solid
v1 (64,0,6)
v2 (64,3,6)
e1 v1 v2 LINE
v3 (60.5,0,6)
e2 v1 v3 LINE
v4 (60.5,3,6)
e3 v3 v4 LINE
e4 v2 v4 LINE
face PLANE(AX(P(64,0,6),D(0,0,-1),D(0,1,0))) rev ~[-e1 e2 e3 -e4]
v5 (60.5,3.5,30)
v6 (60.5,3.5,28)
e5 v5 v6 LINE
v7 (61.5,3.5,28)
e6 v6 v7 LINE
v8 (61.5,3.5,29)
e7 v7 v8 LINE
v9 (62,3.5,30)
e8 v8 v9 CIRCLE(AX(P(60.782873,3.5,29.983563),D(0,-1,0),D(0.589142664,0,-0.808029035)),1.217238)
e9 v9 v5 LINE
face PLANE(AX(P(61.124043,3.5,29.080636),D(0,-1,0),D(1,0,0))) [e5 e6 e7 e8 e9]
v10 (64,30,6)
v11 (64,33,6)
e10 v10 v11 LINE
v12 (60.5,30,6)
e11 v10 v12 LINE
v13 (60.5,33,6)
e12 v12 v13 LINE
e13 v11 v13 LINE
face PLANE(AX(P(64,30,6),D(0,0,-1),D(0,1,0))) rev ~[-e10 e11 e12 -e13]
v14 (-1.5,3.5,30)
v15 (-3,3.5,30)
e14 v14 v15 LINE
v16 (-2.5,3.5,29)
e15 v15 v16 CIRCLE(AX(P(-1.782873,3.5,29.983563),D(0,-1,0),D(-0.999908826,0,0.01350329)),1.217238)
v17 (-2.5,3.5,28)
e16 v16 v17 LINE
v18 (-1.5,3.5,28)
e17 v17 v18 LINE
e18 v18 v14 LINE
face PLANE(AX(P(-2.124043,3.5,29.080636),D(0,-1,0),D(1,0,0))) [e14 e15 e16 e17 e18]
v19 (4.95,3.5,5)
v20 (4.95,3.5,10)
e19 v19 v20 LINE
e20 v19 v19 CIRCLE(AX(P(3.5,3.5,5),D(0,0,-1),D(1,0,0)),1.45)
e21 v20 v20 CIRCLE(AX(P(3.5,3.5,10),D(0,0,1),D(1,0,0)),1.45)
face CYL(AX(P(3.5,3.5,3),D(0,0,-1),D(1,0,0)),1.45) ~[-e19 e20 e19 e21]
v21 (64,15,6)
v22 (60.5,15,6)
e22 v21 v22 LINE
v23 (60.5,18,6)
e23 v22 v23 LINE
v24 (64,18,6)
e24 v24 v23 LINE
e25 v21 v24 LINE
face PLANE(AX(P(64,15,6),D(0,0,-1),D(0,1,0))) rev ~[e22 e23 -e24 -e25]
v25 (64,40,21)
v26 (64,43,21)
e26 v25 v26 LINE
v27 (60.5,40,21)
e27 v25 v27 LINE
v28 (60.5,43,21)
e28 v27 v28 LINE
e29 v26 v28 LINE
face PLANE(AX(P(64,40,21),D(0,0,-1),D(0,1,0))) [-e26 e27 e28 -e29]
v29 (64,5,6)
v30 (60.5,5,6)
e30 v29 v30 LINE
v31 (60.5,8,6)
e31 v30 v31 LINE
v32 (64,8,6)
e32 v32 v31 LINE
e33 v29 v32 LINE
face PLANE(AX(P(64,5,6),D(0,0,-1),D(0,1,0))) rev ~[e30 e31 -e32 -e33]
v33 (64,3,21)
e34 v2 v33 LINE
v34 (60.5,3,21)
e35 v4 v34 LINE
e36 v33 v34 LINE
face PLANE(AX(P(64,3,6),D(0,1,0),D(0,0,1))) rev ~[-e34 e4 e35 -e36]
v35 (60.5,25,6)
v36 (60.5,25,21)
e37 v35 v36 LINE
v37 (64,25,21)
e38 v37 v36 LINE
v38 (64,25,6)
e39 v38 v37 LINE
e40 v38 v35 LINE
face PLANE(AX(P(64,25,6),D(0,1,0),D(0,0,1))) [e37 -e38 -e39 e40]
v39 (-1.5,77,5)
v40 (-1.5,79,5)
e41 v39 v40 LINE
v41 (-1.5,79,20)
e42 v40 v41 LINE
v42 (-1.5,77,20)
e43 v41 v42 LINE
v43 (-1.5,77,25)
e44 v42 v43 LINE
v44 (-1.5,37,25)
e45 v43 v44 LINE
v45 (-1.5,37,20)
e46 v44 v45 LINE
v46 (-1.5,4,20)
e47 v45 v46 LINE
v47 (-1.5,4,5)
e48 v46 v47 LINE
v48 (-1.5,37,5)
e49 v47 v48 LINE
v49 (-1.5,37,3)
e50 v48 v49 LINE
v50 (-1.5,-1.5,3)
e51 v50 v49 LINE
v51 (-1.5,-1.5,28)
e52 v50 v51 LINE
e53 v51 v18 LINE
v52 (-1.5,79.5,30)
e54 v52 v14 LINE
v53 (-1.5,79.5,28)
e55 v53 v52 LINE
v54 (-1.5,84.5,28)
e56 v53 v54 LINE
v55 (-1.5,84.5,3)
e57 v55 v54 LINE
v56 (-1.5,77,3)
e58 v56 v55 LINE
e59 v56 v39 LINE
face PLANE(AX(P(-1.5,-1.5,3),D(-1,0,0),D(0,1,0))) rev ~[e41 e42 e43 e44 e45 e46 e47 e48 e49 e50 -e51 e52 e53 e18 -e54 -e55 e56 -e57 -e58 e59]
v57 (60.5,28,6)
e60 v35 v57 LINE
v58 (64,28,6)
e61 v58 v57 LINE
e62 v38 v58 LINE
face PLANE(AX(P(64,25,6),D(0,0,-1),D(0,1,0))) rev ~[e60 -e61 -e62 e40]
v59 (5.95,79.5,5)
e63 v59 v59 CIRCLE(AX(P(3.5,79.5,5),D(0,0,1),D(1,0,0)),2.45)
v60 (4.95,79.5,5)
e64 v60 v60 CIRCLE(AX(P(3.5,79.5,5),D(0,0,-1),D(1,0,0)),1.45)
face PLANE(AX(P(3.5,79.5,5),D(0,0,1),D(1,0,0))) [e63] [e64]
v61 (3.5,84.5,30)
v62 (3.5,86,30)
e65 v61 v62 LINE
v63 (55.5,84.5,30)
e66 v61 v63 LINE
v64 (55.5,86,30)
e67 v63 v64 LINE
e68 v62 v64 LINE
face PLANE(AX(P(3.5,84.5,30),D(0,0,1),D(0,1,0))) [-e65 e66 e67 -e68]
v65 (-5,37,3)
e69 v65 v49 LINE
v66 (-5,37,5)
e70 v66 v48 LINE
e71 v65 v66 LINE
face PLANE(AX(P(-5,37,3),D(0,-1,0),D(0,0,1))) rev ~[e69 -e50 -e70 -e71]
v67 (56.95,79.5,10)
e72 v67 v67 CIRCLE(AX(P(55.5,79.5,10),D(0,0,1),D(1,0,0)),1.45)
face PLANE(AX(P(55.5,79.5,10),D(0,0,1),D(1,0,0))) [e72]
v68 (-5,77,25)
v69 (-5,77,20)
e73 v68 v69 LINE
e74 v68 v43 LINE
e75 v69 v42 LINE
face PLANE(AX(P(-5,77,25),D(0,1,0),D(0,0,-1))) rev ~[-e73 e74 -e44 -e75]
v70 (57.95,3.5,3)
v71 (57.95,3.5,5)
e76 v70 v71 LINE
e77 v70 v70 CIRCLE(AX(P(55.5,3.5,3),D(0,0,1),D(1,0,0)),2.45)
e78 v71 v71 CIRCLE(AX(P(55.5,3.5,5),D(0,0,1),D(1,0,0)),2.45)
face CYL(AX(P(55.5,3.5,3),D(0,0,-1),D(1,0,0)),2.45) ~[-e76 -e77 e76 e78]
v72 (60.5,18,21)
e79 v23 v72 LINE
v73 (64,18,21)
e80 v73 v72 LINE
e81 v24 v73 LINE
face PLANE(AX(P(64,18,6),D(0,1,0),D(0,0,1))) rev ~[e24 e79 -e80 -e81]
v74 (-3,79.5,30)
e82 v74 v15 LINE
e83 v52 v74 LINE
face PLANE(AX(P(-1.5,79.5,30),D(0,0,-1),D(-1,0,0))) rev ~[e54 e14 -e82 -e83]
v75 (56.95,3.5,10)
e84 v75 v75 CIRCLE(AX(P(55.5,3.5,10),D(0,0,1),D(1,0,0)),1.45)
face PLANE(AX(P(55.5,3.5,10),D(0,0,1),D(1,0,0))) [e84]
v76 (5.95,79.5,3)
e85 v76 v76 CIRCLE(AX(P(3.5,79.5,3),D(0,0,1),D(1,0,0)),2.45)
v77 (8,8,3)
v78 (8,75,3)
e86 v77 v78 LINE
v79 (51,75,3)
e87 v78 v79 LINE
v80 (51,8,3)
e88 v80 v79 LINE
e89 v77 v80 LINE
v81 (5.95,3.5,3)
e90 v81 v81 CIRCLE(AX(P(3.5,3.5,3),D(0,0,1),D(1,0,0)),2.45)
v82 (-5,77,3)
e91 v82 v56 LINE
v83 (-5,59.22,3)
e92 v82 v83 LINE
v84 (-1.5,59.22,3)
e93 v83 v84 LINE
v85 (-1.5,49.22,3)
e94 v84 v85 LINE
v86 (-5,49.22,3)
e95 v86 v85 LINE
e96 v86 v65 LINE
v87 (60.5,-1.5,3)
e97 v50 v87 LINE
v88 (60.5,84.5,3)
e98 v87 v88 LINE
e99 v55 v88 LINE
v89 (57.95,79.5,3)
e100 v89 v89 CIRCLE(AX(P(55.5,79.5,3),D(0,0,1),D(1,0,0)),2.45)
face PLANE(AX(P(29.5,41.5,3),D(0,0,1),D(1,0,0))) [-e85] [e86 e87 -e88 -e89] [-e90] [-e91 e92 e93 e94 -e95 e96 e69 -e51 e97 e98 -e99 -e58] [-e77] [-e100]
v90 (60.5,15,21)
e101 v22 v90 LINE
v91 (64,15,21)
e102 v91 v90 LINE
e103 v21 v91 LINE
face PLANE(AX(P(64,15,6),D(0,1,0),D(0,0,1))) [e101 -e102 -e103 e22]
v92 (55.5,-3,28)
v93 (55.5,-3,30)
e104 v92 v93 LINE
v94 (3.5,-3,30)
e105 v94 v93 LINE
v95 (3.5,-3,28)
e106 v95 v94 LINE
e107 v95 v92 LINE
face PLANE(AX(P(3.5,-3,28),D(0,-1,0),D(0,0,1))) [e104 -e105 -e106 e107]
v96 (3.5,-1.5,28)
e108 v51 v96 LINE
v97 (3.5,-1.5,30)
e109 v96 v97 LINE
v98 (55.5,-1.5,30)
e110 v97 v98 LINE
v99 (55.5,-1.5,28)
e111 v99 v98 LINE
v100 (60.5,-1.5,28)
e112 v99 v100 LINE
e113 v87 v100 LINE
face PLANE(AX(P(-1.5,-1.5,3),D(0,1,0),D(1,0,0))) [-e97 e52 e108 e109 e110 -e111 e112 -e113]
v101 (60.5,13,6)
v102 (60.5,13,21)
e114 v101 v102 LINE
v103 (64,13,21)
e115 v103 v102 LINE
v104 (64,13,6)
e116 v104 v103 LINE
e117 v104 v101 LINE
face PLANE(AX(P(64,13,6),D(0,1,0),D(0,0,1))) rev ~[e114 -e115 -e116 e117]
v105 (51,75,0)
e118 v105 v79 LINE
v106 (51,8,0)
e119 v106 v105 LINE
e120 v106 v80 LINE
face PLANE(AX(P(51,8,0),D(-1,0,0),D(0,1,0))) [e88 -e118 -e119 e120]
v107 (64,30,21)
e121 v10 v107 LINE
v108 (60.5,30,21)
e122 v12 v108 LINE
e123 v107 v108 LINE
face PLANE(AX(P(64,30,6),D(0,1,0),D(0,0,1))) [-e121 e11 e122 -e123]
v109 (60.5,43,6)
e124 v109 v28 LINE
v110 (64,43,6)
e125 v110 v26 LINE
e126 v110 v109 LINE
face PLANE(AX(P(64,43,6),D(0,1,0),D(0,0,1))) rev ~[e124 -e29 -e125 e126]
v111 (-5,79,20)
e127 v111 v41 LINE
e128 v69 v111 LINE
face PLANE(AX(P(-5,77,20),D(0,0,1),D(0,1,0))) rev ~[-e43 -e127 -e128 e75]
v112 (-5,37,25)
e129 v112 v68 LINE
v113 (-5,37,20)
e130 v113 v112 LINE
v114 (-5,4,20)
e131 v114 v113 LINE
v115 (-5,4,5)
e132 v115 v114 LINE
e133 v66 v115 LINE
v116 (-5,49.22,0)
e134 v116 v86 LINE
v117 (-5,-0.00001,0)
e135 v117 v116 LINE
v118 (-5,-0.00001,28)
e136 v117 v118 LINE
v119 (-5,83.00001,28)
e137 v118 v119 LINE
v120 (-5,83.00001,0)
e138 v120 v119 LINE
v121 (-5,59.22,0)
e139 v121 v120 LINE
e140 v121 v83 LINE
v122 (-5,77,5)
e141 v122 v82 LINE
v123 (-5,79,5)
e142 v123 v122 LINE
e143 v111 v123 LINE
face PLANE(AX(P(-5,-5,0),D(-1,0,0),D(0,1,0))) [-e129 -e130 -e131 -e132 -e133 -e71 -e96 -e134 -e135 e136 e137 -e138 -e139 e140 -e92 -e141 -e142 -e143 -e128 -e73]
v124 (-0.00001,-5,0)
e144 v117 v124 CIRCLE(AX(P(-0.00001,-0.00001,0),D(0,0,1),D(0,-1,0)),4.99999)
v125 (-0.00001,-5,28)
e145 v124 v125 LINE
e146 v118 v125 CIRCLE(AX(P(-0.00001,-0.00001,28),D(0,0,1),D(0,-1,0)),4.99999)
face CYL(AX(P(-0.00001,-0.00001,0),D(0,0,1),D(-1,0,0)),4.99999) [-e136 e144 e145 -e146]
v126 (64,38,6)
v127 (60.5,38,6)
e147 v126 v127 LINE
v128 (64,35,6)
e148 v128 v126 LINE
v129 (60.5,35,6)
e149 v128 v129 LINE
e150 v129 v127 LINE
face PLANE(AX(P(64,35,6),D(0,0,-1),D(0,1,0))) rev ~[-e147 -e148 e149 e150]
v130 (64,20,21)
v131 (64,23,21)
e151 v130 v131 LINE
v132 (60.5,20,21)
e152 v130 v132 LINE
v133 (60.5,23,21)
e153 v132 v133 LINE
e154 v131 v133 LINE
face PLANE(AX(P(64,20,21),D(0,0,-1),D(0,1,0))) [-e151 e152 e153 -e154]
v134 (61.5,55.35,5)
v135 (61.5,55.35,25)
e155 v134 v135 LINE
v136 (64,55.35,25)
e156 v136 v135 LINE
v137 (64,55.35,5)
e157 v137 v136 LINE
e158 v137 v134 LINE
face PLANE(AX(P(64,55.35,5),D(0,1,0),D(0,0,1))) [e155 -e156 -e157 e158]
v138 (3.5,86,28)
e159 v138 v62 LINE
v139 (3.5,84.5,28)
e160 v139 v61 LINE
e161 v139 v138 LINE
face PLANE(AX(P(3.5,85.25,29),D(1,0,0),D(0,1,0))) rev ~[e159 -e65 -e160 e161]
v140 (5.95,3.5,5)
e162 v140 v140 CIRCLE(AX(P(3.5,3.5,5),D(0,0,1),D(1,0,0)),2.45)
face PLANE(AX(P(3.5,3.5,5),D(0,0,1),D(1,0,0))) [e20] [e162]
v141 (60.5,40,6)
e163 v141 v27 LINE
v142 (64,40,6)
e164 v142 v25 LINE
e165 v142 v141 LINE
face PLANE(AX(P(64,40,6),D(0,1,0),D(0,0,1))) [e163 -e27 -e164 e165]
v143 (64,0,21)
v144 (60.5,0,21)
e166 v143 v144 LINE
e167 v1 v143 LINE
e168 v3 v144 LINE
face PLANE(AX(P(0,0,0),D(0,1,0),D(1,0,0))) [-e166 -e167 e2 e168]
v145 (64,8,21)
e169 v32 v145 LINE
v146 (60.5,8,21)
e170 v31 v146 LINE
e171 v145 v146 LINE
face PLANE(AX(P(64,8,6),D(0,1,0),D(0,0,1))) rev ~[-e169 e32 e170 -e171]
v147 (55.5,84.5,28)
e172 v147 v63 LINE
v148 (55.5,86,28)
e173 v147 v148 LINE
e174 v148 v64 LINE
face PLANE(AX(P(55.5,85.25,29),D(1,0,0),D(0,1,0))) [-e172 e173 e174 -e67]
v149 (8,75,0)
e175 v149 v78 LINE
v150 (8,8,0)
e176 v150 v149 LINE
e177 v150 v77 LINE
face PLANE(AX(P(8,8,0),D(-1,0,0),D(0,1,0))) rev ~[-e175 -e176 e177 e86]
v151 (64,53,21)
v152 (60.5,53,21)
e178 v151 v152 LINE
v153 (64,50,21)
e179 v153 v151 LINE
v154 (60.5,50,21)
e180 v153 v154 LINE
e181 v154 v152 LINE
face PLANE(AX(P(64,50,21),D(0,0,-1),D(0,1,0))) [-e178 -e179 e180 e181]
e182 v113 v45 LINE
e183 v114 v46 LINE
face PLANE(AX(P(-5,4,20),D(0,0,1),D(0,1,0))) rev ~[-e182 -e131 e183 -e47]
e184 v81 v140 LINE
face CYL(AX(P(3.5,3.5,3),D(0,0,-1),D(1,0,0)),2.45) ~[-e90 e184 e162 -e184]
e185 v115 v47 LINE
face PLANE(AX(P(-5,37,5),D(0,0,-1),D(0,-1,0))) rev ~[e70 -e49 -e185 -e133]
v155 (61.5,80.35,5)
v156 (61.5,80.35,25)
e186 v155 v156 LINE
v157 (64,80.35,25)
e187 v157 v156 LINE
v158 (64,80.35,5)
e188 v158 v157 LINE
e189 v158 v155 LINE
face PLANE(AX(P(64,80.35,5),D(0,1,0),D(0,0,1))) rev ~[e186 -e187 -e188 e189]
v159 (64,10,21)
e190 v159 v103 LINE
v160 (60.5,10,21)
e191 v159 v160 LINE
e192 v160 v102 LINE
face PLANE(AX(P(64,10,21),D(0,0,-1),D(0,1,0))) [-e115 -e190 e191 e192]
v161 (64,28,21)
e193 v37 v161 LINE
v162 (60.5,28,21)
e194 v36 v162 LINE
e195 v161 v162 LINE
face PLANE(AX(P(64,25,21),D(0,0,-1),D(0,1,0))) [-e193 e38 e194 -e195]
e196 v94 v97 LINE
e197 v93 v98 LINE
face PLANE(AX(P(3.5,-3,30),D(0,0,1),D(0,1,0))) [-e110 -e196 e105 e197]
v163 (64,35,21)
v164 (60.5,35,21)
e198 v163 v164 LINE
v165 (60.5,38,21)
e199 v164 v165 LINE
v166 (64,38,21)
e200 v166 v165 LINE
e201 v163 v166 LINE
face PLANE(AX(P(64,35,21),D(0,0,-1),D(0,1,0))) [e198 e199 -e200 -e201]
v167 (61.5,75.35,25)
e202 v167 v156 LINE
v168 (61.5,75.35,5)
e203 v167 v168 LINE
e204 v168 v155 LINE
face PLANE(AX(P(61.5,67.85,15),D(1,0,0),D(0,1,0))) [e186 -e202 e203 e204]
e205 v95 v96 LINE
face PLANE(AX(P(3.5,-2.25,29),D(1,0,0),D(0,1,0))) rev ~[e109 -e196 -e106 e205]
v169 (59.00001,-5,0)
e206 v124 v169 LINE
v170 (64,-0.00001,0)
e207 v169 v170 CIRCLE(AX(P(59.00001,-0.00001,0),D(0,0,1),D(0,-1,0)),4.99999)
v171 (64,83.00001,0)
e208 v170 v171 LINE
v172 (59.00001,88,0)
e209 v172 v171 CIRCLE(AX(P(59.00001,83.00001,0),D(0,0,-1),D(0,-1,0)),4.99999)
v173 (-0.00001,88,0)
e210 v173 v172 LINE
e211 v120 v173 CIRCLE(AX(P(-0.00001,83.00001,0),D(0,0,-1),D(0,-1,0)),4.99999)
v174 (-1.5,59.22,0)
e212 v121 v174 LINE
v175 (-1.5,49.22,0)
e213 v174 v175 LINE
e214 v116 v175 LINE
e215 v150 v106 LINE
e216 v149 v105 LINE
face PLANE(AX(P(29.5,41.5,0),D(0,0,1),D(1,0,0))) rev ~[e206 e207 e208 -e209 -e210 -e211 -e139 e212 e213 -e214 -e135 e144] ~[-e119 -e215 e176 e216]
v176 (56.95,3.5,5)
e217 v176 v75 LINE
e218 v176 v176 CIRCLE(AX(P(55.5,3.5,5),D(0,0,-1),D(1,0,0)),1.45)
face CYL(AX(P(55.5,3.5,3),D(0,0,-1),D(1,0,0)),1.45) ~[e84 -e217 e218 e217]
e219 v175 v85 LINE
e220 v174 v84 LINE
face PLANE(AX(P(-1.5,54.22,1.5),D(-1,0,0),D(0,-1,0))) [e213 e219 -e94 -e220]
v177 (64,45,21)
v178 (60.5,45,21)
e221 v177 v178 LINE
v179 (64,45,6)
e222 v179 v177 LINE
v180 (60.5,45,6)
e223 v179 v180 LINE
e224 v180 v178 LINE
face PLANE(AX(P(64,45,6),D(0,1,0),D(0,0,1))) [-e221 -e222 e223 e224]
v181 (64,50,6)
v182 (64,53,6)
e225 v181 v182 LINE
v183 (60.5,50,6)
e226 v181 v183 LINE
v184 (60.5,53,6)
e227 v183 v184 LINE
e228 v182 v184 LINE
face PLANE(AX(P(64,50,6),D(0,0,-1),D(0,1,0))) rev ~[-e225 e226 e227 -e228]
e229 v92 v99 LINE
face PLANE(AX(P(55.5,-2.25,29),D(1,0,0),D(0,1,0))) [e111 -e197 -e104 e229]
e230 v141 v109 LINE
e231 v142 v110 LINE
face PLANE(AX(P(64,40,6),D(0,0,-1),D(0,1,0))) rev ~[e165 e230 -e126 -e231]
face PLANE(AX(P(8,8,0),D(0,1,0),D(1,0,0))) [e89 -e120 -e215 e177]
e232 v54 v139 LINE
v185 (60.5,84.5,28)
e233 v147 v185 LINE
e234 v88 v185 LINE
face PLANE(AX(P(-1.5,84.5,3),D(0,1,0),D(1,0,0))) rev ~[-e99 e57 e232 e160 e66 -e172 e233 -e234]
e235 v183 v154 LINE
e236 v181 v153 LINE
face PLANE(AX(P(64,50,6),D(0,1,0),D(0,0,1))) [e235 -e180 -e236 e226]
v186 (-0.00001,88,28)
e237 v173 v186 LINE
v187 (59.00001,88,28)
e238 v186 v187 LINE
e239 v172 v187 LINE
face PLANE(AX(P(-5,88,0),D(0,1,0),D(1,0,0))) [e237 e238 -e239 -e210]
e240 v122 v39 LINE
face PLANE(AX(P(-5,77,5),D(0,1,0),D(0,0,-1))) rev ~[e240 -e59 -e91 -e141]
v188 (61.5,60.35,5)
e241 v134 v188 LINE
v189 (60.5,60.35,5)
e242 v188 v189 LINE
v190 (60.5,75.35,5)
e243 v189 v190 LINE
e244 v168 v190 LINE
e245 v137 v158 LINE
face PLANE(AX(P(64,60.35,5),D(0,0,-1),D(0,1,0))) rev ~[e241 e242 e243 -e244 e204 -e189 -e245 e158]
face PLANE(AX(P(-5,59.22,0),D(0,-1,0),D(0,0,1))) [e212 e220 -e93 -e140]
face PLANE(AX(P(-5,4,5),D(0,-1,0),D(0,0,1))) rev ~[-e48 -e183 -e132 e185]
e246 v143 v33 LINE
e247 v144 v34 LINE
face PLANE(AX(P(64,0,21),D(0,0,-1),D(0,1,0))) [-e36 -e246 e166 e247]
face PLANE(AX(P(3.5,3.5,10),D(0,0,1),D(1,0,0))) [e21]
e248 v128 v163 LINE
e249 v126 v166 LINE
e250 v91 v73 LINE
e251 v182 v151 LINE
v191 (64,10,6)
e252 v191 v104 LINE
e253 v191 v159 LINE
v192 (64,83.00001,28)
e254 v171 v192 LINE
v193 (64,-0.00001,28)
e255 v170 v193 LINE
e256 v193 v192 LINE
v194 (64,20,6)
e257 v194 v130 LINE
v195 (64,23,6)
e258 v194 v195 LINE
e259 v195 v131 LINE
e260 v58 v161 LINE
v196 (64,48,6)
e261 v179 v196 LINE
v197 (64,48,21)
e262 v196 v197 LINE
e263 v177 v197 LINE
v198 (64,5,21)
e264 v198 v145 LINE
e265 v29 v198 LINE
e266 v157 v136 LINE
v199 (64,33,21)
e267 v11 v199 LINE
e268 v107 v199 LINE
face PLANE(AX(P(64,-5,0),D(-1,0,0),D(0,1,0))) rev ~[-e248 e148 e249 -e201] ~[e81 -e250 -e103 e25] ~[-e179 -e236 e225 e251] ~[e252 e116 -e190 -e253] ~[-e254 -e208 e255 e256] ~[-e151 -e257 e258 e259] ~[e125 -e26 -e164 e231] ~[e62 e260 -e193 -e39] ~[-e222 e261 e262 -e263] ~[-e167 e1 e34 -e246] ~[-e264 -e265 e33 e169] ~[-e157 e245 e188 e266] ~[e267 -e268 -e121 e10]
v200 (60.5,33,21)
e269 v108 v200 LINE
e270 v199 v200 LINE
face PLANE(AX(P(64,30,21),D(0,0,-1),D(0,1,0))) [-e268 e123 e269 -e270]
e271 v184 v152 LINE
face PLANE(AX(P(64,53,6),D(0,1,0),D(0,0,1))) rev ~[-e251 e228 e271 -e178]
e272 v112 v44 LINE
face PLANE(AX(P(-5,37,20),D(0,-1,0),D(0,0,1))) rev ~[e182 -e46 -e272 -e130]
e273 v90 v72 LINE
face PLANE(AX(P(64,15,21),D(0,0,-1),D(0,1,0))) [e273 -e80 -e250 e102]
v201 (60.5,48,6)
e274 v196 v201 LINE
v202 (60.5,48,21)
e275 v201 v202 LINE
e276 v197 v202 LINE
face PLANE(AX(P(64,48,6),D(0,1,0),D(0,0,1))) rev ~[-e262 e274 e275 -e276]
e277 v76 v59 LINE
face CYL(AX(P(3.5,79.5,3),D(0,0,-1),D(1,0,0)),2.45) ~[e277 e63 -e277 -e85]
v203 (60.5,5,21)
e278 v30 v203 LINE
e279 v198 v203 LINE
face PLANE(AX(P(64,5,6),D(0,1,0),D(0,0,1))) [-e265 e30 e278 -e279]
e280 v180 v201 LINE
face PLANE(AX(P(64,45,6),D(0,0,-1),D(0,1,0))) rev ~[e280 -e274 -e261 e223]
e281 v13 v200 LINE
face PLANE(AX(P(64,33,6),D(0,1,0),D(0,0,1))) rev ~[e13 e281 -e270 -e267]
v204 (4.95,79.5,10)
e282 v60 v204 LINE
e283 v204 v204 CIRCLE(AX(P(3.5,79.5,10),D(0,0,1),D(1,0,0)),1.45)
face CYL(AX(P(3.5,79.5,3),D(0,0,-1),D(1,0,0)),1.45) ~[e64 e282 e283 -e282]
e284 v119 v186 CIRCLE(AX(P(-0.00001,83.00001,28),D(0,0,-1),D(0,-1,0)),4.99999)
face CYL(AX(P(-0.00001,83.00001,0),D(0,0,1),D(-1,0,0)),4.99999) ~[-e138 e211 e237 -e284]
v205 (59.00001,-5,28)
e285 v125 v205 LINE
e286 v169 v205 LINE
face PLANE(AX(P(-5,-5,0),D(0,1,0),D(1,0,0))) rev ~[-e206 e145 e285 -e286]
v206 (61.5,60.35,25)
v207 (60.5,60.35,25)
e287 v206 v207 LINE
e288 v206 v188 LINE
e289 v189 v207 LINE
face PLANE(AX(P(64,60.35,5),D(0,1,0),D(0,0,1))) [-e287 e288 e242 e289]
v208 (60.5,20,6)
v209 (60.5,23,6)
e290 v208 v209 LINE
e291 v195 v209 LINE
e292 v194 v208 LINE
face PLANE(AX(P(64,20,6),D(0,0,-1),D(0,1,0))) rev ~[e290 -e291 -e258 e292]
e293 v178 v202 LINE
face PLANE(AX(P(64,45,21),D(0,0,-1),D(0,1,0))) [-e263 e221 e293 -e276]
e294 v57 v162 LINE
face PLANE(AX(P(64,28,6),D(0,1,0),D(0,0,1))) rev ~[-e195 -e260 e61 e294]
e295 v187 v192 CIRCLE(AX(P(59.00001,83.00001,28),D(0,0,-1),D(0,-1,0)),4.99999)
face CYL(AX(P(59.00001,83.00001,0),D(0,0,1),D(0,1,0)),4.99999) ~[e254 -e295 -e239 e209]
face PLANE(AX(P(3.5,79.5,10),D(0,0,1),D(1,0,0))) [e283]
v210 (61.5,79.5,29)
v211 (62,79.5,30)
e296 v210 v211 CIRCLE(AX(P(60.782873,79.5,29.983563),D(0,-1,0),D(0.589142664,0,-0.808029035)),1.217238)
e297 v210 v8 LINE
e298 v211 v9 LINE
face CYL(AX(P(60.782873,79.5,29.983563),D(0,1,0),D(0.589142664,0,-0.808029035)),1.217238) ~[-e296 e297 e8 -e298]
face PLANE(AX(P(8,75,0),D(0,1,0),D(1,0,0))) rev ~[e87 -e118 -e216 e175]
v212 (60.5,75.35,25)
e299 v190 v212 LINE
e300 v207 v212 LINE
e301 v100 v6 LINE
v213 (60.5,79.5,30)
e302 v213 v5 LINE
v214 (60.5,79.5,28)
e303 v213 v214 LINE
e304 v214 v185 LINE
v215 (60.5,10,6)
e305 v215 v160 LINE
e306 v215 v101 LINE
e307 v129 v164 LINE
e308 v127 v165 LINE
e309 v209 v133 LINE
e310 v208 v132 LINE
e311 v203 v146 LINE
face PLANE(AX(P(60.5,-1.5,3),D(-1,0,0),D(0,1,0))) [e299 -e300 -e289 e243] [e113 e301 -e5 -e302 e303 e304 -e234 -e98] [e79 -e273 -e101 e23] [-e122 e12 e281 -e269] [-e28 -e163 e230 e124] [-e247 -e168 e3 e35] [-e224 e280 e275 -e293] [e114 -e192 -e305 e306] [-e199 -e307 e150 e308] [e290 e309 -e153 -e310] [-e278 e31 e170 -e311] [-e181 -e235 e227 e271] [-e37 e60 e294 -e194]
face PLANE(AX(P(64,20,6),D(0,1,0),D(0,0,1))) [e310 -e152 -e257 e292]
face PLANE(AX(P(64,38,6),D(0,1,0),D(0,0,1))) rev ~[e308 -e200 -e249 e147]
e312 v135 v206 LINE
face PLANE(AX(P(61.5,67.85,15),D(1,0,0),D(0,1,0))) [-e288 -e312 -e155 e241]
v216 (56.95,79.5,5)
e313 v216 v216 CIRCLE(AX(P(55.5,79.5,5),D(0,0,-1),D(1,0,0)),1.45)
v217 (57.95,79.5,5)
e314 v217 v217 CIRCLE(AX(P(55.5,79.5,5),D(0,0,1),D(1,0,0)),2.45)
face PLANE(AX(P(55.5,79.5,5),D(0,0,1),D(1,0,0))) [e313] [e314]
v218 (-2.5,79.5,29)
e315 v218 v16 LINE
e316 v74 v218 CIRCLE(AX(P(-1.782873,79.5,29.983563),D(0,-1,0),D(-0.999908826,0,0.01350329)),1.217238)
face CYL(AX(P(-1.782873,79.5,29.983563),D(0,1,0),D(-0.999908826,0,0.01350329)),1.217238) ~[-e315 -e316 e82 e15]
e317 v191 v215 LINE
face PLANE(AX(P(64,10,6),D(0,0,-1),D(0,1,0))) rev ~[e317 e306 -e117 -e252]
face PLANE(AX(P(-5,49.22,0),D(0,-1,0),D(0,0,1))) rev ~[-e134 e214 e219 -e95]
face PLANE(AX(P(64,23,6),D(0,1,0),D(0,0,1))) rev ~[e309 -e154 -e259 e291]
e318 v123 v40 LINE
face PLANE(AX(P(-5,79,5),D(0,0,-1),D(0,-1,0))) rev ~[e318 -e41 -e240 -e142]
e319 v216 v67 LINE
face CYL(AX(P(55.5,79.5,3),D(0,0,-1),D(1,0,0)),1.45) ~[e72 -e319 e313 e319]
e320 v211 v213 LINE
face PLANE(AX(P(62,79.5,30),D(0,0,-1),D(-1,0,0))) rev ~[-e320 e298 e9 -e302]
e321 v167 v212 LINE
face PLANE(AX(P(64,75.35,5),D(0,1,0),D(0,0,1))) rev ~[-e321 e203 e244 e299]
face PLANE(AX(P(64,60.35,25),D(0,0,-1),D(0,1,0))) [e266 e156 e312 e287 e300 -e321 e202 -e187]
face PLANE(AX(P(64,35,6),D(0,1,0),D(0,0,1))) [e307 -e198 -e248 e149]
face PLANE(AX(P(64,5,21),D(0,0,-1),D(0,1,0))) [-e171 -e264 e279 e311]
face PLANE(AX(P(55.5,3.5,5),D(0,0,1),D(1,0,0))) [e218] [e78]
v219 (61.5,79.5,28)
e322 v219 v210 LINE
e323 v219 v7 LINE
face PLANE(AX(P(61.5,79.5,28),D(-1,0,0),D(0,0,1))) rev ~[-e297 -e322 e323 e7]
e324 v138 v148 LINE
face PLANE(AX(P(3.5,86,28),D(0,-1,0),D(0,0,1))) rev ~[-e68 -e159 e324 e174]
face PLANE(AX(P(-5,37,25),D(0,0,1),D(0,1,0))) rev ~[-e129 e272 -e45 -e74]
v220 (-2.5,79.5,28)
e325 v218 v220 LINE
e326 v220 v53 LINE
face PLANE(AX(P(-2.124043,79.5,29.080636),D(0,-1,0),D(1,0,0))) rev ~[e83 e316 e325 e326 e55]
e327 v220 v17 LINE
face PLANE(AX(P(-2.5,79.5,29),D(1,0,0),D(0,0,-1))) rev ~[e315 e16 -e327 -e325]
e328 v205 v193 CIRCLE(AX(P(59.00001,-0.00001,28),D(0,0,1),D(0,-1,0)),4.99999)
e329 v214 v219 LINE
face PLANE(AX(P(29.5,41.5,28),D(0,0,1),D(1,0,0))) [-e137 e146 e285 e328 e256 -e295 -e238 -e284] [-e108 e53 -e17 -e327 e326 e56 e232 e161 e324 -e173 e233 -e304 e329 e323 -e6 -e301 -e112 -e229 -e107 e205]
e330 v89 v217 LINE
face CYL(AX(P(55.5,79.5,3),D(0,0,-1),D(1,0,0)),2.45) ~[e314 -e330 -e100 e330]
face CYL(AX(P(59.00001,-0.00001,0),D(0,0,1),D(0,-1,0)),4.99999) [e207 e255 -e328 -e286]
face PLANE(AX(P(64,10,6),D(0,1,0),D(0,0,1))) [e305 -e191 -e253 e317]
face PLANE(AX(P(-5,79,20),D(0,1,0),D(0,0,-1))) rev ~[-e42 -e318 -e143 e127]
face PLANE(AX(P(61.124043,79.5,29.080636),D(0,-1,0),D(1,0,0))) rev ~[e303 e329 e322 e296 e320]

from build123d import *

# Parameters (mm, degrees)
F0_W      = 59
F0_H      = 83
F0_W_2    = 43
F0_H_2    = 67
F1_DEPTH  = 3
F2_R      = 1.45
F3_DEPTH  = 7
F4_W      = 69
F4_H      = 93
F4_W_2    = 59
F4_H_2    = 83
F5_DEPTH  = 28
F6_R      = 2.45
F7_DEPTH  = 2
F9_DEPTH  = 5
F10_W     = 15
F10_H     = 20
F10_W_2   = 3
F10_H_2   = 15
F11_DEPTH = 5
F12_W     = 62
F12_H     = 86
F12_R     = 2.5
F13_DEPTH = 25
F15_W     = 10
F15_H     = 3
F16_DEPTH = 3.5
F17_W     = 25
F17_H     = 20
F18_DEPTH = 2.5
F21_DEPTH = 76
F23_W     = 1.5
F23_H     = 2
F24_DEPTH = 52
F25_R     = 4.99999


# Not quite as in the source:
# - a fillet or chamfer is up to 0.001 mm smaller than in the source, because OpenCascade refuses the exact size


with BuildPart() as f1:
    # F0 (on Top) → F1 (new body)
    with BuildSketch(Plane.XY):
        with Locations((29.5, 41.5)):
            Rectangle(F0_W, F0_H)
        with Locations((29.5, 41.5)):
            Rectangle(F0_W_2, F0_H_2, mode=Mode.SUBTRACT)
    extrude(amount=F1_DEPTH)

    # F2 (on face) → F3 (join)
    with BuildSketch(Plane.XY.offset(3)):
        with Locations((3.5, 3.5)):
            Circle(F2_R)
        with Locations((55.5, 3.5)):
            Circle(F2_R)
        with Locations((3.5, 79.5)):
            Circle(F2_R)
        with Locations((55.5, 79.5)):
            Circle(F2_R)
    extrude(amount=F3_DEPTH)

    # F4 (on Top) → F5 (join)
    with BuildSketch(Plane.XY):
        with Locations((29.5, 41.5)):
            Rectangle(F4_W, F4_H)
        with Locations((29.5, 41.5)):
            Rectangle(F4_W_2, F4_H_2, mode=Mode.SUBTRACT)
    extrude(amount=F5_DEPTH)

    # F6 (on face) → F7 (join)
    with BuildSketch(Plane.XY.offset(3)):
        with Locations((3.5, 79.5)):
            Circle(F6_R)
        with Locations((55.5, 79.5)):
            Circle(F6_R)
        with Locations((55.5, 3.5)):
            Circle(F6_R)
        with Locations((3.5, 3.5)):
            Circle(F6_R)
    extrude(amount=F7_DEPTH)

    # F8 (on face) → F9 (cut, through all)
    with BuildSketch(Plane(origin=(-5, 0, 0), x_dir=(0, -1, 0), z_dir=(-1, 0, 0))):
        Polygon((-79, 20), (-79, 5), (-77, 5), (-77, 3), (-37, 3), (-37, 5), (-4, 5), (-4, 20), (-37, 20), (-37, 25), (-77, 25), (-77, 20), align=None)
    extrude(amount=-F9_DEPTH, mode=Mode.SUBTRACT)

    # F10 (on face) → F11 (cut, through all)
    with BuildSketch(Plane.YZ.offset(64)):
        with Locations((67.85, 15)):
            Rectangle(F10_W, F10_H)
        with Locations((1.5, 13.5)):
            Rectangle(F10_W_2, F10_H_2)
        with Locations((6.5, 13.5)):
            Rectangle(F10_W_2, F10_H_2)
        with Locations((11.5, 13.5)):
            Rectangle(F10_W_2, F10_H_2)
        with Locations((16.5, 13.5)):
            Rectangle(F10_W_2, F10_H_2)
        with Locations((21.5, 13.5)):
            Rectangle(F10_W_2, F10_H_2)
        with Locations((26.5, 13.5)):
            Rectangle(F10_W_2, F10_H_2)
        with Locations((31.5, 13.5)):
            Rectangle(F10_W_2, F10_H_2)
        with Locations((36.5, 13.5)):
            Rectangle(F10_W_2, F10_H_2)
        with Locations((41.5, 13.5)):
            Rectangle(F10_W_2, F10_H_2)
        with Locations((46.5, 13.5)):
            Rectangle(F10_W_2, F10_H_2)
        with Locations((51.5, 13.5)):
            Rectangle(F10_W_2, F10_H_2)
    extrude(amount=-F11_DEPTH, mode=Mode.SUBTRACT)

    # F12 (on face) → F13 (cut)
    with BuildSketch(Plane.XY.offset(3)):
        with Locations((29.5, 41.5)):
            Rectangle(F12_W, F12_H)
        with Locations((3.5, 3.5)):
            Circle(F12_R, mode=Mode.SUBTRACT)
        with Locations((55.5, 3.5)):
            Circle(F12_R, mode=Mode.SUBTRACT)
        with Locations((3.5, 79.5)):
            Circle(F12_R, mode=Mode.SUBTRACT)
        with Locations((55.5, 79.5)):
            Circle(F12_R, mode=Mode.SUBTRACT)
    extrude(amount=F13_DEPTH, mode=Mode.SUBTRACT)

    # F15 (on face) → F16 (cut)
    with BuildSketch(Plane(origin=(-5, 0, 0), x_dir=(0, -1, 0), z_dir=(-1, 0, 0))):
        with Locations((-54.22, 1.5)):
            Rectangle(F15_W, F15_H)
    extrude(amount=-F16_DEPTH, mode=Mode.SUBTRACT)

    # F17 (on face) → F18 (cut)
    with BuildSketch(Plane.YZ.offset(64)):
        with Locations((67.85, 15)):
            Rectangle(F17_W, F17_H)
    extrude(amount=-F18_DEPTH, mode=Mode.SUBTRACT)

    # F20 (on offset) → F21 (join)
    with BuildSketch(Plane.XZ.offset(-79.5)):
        with BuildLine():
            Line((-2.5, 29), (-2.5, 28))
            Line((-2.5, 28), (-1.5, 28))
            Line((-1.5, 28), (-1.5, 30))
            Line((-1.5, 30), (-3, 30))
            ThreePointArc((-3, 30), (-2.8716037917, 29.4391981041), (-2.5, 29))
        make_face()
        with BuildLine():
            Line((60.5, 28), (61.5, 28))
            Line((61.5, 28), (61.5, 29))
            ThreePointArc((61.5, 29), (61.8716037917, 29.4391981041), (62, 30))
            Line((62, 30), (60.5, 30))
            Line((60.5, 30), (60.5, 28))
        make_face()
    extrude(amount=F21_DEPTH)

    # F23 (on offset) → F24 (join)
    with BuildSketch(Plane.YZ.offset(3.5)):
        with Locations((-2.25, 29)):
            Rectangle(F23_W, F23_H)
        with Locations((85.25, 29)):
            Rectangle(F23_W, F23_H)
    extrude(amount=F24_DEPTH)

    # F25 (radius 5 in the source; OpenCascade refuses exactly that, so slightly less here)
    f25_edges = [f1.edges().sort_by_distance(p)[0] for p in [
        (-5, -5, 14),
        (64, -5, 14),
        (64, 88, 14),
        (-5, 88, 14),
    ]]
    fillet(f25_edges, radius=F25_R)


solid = f1.part
